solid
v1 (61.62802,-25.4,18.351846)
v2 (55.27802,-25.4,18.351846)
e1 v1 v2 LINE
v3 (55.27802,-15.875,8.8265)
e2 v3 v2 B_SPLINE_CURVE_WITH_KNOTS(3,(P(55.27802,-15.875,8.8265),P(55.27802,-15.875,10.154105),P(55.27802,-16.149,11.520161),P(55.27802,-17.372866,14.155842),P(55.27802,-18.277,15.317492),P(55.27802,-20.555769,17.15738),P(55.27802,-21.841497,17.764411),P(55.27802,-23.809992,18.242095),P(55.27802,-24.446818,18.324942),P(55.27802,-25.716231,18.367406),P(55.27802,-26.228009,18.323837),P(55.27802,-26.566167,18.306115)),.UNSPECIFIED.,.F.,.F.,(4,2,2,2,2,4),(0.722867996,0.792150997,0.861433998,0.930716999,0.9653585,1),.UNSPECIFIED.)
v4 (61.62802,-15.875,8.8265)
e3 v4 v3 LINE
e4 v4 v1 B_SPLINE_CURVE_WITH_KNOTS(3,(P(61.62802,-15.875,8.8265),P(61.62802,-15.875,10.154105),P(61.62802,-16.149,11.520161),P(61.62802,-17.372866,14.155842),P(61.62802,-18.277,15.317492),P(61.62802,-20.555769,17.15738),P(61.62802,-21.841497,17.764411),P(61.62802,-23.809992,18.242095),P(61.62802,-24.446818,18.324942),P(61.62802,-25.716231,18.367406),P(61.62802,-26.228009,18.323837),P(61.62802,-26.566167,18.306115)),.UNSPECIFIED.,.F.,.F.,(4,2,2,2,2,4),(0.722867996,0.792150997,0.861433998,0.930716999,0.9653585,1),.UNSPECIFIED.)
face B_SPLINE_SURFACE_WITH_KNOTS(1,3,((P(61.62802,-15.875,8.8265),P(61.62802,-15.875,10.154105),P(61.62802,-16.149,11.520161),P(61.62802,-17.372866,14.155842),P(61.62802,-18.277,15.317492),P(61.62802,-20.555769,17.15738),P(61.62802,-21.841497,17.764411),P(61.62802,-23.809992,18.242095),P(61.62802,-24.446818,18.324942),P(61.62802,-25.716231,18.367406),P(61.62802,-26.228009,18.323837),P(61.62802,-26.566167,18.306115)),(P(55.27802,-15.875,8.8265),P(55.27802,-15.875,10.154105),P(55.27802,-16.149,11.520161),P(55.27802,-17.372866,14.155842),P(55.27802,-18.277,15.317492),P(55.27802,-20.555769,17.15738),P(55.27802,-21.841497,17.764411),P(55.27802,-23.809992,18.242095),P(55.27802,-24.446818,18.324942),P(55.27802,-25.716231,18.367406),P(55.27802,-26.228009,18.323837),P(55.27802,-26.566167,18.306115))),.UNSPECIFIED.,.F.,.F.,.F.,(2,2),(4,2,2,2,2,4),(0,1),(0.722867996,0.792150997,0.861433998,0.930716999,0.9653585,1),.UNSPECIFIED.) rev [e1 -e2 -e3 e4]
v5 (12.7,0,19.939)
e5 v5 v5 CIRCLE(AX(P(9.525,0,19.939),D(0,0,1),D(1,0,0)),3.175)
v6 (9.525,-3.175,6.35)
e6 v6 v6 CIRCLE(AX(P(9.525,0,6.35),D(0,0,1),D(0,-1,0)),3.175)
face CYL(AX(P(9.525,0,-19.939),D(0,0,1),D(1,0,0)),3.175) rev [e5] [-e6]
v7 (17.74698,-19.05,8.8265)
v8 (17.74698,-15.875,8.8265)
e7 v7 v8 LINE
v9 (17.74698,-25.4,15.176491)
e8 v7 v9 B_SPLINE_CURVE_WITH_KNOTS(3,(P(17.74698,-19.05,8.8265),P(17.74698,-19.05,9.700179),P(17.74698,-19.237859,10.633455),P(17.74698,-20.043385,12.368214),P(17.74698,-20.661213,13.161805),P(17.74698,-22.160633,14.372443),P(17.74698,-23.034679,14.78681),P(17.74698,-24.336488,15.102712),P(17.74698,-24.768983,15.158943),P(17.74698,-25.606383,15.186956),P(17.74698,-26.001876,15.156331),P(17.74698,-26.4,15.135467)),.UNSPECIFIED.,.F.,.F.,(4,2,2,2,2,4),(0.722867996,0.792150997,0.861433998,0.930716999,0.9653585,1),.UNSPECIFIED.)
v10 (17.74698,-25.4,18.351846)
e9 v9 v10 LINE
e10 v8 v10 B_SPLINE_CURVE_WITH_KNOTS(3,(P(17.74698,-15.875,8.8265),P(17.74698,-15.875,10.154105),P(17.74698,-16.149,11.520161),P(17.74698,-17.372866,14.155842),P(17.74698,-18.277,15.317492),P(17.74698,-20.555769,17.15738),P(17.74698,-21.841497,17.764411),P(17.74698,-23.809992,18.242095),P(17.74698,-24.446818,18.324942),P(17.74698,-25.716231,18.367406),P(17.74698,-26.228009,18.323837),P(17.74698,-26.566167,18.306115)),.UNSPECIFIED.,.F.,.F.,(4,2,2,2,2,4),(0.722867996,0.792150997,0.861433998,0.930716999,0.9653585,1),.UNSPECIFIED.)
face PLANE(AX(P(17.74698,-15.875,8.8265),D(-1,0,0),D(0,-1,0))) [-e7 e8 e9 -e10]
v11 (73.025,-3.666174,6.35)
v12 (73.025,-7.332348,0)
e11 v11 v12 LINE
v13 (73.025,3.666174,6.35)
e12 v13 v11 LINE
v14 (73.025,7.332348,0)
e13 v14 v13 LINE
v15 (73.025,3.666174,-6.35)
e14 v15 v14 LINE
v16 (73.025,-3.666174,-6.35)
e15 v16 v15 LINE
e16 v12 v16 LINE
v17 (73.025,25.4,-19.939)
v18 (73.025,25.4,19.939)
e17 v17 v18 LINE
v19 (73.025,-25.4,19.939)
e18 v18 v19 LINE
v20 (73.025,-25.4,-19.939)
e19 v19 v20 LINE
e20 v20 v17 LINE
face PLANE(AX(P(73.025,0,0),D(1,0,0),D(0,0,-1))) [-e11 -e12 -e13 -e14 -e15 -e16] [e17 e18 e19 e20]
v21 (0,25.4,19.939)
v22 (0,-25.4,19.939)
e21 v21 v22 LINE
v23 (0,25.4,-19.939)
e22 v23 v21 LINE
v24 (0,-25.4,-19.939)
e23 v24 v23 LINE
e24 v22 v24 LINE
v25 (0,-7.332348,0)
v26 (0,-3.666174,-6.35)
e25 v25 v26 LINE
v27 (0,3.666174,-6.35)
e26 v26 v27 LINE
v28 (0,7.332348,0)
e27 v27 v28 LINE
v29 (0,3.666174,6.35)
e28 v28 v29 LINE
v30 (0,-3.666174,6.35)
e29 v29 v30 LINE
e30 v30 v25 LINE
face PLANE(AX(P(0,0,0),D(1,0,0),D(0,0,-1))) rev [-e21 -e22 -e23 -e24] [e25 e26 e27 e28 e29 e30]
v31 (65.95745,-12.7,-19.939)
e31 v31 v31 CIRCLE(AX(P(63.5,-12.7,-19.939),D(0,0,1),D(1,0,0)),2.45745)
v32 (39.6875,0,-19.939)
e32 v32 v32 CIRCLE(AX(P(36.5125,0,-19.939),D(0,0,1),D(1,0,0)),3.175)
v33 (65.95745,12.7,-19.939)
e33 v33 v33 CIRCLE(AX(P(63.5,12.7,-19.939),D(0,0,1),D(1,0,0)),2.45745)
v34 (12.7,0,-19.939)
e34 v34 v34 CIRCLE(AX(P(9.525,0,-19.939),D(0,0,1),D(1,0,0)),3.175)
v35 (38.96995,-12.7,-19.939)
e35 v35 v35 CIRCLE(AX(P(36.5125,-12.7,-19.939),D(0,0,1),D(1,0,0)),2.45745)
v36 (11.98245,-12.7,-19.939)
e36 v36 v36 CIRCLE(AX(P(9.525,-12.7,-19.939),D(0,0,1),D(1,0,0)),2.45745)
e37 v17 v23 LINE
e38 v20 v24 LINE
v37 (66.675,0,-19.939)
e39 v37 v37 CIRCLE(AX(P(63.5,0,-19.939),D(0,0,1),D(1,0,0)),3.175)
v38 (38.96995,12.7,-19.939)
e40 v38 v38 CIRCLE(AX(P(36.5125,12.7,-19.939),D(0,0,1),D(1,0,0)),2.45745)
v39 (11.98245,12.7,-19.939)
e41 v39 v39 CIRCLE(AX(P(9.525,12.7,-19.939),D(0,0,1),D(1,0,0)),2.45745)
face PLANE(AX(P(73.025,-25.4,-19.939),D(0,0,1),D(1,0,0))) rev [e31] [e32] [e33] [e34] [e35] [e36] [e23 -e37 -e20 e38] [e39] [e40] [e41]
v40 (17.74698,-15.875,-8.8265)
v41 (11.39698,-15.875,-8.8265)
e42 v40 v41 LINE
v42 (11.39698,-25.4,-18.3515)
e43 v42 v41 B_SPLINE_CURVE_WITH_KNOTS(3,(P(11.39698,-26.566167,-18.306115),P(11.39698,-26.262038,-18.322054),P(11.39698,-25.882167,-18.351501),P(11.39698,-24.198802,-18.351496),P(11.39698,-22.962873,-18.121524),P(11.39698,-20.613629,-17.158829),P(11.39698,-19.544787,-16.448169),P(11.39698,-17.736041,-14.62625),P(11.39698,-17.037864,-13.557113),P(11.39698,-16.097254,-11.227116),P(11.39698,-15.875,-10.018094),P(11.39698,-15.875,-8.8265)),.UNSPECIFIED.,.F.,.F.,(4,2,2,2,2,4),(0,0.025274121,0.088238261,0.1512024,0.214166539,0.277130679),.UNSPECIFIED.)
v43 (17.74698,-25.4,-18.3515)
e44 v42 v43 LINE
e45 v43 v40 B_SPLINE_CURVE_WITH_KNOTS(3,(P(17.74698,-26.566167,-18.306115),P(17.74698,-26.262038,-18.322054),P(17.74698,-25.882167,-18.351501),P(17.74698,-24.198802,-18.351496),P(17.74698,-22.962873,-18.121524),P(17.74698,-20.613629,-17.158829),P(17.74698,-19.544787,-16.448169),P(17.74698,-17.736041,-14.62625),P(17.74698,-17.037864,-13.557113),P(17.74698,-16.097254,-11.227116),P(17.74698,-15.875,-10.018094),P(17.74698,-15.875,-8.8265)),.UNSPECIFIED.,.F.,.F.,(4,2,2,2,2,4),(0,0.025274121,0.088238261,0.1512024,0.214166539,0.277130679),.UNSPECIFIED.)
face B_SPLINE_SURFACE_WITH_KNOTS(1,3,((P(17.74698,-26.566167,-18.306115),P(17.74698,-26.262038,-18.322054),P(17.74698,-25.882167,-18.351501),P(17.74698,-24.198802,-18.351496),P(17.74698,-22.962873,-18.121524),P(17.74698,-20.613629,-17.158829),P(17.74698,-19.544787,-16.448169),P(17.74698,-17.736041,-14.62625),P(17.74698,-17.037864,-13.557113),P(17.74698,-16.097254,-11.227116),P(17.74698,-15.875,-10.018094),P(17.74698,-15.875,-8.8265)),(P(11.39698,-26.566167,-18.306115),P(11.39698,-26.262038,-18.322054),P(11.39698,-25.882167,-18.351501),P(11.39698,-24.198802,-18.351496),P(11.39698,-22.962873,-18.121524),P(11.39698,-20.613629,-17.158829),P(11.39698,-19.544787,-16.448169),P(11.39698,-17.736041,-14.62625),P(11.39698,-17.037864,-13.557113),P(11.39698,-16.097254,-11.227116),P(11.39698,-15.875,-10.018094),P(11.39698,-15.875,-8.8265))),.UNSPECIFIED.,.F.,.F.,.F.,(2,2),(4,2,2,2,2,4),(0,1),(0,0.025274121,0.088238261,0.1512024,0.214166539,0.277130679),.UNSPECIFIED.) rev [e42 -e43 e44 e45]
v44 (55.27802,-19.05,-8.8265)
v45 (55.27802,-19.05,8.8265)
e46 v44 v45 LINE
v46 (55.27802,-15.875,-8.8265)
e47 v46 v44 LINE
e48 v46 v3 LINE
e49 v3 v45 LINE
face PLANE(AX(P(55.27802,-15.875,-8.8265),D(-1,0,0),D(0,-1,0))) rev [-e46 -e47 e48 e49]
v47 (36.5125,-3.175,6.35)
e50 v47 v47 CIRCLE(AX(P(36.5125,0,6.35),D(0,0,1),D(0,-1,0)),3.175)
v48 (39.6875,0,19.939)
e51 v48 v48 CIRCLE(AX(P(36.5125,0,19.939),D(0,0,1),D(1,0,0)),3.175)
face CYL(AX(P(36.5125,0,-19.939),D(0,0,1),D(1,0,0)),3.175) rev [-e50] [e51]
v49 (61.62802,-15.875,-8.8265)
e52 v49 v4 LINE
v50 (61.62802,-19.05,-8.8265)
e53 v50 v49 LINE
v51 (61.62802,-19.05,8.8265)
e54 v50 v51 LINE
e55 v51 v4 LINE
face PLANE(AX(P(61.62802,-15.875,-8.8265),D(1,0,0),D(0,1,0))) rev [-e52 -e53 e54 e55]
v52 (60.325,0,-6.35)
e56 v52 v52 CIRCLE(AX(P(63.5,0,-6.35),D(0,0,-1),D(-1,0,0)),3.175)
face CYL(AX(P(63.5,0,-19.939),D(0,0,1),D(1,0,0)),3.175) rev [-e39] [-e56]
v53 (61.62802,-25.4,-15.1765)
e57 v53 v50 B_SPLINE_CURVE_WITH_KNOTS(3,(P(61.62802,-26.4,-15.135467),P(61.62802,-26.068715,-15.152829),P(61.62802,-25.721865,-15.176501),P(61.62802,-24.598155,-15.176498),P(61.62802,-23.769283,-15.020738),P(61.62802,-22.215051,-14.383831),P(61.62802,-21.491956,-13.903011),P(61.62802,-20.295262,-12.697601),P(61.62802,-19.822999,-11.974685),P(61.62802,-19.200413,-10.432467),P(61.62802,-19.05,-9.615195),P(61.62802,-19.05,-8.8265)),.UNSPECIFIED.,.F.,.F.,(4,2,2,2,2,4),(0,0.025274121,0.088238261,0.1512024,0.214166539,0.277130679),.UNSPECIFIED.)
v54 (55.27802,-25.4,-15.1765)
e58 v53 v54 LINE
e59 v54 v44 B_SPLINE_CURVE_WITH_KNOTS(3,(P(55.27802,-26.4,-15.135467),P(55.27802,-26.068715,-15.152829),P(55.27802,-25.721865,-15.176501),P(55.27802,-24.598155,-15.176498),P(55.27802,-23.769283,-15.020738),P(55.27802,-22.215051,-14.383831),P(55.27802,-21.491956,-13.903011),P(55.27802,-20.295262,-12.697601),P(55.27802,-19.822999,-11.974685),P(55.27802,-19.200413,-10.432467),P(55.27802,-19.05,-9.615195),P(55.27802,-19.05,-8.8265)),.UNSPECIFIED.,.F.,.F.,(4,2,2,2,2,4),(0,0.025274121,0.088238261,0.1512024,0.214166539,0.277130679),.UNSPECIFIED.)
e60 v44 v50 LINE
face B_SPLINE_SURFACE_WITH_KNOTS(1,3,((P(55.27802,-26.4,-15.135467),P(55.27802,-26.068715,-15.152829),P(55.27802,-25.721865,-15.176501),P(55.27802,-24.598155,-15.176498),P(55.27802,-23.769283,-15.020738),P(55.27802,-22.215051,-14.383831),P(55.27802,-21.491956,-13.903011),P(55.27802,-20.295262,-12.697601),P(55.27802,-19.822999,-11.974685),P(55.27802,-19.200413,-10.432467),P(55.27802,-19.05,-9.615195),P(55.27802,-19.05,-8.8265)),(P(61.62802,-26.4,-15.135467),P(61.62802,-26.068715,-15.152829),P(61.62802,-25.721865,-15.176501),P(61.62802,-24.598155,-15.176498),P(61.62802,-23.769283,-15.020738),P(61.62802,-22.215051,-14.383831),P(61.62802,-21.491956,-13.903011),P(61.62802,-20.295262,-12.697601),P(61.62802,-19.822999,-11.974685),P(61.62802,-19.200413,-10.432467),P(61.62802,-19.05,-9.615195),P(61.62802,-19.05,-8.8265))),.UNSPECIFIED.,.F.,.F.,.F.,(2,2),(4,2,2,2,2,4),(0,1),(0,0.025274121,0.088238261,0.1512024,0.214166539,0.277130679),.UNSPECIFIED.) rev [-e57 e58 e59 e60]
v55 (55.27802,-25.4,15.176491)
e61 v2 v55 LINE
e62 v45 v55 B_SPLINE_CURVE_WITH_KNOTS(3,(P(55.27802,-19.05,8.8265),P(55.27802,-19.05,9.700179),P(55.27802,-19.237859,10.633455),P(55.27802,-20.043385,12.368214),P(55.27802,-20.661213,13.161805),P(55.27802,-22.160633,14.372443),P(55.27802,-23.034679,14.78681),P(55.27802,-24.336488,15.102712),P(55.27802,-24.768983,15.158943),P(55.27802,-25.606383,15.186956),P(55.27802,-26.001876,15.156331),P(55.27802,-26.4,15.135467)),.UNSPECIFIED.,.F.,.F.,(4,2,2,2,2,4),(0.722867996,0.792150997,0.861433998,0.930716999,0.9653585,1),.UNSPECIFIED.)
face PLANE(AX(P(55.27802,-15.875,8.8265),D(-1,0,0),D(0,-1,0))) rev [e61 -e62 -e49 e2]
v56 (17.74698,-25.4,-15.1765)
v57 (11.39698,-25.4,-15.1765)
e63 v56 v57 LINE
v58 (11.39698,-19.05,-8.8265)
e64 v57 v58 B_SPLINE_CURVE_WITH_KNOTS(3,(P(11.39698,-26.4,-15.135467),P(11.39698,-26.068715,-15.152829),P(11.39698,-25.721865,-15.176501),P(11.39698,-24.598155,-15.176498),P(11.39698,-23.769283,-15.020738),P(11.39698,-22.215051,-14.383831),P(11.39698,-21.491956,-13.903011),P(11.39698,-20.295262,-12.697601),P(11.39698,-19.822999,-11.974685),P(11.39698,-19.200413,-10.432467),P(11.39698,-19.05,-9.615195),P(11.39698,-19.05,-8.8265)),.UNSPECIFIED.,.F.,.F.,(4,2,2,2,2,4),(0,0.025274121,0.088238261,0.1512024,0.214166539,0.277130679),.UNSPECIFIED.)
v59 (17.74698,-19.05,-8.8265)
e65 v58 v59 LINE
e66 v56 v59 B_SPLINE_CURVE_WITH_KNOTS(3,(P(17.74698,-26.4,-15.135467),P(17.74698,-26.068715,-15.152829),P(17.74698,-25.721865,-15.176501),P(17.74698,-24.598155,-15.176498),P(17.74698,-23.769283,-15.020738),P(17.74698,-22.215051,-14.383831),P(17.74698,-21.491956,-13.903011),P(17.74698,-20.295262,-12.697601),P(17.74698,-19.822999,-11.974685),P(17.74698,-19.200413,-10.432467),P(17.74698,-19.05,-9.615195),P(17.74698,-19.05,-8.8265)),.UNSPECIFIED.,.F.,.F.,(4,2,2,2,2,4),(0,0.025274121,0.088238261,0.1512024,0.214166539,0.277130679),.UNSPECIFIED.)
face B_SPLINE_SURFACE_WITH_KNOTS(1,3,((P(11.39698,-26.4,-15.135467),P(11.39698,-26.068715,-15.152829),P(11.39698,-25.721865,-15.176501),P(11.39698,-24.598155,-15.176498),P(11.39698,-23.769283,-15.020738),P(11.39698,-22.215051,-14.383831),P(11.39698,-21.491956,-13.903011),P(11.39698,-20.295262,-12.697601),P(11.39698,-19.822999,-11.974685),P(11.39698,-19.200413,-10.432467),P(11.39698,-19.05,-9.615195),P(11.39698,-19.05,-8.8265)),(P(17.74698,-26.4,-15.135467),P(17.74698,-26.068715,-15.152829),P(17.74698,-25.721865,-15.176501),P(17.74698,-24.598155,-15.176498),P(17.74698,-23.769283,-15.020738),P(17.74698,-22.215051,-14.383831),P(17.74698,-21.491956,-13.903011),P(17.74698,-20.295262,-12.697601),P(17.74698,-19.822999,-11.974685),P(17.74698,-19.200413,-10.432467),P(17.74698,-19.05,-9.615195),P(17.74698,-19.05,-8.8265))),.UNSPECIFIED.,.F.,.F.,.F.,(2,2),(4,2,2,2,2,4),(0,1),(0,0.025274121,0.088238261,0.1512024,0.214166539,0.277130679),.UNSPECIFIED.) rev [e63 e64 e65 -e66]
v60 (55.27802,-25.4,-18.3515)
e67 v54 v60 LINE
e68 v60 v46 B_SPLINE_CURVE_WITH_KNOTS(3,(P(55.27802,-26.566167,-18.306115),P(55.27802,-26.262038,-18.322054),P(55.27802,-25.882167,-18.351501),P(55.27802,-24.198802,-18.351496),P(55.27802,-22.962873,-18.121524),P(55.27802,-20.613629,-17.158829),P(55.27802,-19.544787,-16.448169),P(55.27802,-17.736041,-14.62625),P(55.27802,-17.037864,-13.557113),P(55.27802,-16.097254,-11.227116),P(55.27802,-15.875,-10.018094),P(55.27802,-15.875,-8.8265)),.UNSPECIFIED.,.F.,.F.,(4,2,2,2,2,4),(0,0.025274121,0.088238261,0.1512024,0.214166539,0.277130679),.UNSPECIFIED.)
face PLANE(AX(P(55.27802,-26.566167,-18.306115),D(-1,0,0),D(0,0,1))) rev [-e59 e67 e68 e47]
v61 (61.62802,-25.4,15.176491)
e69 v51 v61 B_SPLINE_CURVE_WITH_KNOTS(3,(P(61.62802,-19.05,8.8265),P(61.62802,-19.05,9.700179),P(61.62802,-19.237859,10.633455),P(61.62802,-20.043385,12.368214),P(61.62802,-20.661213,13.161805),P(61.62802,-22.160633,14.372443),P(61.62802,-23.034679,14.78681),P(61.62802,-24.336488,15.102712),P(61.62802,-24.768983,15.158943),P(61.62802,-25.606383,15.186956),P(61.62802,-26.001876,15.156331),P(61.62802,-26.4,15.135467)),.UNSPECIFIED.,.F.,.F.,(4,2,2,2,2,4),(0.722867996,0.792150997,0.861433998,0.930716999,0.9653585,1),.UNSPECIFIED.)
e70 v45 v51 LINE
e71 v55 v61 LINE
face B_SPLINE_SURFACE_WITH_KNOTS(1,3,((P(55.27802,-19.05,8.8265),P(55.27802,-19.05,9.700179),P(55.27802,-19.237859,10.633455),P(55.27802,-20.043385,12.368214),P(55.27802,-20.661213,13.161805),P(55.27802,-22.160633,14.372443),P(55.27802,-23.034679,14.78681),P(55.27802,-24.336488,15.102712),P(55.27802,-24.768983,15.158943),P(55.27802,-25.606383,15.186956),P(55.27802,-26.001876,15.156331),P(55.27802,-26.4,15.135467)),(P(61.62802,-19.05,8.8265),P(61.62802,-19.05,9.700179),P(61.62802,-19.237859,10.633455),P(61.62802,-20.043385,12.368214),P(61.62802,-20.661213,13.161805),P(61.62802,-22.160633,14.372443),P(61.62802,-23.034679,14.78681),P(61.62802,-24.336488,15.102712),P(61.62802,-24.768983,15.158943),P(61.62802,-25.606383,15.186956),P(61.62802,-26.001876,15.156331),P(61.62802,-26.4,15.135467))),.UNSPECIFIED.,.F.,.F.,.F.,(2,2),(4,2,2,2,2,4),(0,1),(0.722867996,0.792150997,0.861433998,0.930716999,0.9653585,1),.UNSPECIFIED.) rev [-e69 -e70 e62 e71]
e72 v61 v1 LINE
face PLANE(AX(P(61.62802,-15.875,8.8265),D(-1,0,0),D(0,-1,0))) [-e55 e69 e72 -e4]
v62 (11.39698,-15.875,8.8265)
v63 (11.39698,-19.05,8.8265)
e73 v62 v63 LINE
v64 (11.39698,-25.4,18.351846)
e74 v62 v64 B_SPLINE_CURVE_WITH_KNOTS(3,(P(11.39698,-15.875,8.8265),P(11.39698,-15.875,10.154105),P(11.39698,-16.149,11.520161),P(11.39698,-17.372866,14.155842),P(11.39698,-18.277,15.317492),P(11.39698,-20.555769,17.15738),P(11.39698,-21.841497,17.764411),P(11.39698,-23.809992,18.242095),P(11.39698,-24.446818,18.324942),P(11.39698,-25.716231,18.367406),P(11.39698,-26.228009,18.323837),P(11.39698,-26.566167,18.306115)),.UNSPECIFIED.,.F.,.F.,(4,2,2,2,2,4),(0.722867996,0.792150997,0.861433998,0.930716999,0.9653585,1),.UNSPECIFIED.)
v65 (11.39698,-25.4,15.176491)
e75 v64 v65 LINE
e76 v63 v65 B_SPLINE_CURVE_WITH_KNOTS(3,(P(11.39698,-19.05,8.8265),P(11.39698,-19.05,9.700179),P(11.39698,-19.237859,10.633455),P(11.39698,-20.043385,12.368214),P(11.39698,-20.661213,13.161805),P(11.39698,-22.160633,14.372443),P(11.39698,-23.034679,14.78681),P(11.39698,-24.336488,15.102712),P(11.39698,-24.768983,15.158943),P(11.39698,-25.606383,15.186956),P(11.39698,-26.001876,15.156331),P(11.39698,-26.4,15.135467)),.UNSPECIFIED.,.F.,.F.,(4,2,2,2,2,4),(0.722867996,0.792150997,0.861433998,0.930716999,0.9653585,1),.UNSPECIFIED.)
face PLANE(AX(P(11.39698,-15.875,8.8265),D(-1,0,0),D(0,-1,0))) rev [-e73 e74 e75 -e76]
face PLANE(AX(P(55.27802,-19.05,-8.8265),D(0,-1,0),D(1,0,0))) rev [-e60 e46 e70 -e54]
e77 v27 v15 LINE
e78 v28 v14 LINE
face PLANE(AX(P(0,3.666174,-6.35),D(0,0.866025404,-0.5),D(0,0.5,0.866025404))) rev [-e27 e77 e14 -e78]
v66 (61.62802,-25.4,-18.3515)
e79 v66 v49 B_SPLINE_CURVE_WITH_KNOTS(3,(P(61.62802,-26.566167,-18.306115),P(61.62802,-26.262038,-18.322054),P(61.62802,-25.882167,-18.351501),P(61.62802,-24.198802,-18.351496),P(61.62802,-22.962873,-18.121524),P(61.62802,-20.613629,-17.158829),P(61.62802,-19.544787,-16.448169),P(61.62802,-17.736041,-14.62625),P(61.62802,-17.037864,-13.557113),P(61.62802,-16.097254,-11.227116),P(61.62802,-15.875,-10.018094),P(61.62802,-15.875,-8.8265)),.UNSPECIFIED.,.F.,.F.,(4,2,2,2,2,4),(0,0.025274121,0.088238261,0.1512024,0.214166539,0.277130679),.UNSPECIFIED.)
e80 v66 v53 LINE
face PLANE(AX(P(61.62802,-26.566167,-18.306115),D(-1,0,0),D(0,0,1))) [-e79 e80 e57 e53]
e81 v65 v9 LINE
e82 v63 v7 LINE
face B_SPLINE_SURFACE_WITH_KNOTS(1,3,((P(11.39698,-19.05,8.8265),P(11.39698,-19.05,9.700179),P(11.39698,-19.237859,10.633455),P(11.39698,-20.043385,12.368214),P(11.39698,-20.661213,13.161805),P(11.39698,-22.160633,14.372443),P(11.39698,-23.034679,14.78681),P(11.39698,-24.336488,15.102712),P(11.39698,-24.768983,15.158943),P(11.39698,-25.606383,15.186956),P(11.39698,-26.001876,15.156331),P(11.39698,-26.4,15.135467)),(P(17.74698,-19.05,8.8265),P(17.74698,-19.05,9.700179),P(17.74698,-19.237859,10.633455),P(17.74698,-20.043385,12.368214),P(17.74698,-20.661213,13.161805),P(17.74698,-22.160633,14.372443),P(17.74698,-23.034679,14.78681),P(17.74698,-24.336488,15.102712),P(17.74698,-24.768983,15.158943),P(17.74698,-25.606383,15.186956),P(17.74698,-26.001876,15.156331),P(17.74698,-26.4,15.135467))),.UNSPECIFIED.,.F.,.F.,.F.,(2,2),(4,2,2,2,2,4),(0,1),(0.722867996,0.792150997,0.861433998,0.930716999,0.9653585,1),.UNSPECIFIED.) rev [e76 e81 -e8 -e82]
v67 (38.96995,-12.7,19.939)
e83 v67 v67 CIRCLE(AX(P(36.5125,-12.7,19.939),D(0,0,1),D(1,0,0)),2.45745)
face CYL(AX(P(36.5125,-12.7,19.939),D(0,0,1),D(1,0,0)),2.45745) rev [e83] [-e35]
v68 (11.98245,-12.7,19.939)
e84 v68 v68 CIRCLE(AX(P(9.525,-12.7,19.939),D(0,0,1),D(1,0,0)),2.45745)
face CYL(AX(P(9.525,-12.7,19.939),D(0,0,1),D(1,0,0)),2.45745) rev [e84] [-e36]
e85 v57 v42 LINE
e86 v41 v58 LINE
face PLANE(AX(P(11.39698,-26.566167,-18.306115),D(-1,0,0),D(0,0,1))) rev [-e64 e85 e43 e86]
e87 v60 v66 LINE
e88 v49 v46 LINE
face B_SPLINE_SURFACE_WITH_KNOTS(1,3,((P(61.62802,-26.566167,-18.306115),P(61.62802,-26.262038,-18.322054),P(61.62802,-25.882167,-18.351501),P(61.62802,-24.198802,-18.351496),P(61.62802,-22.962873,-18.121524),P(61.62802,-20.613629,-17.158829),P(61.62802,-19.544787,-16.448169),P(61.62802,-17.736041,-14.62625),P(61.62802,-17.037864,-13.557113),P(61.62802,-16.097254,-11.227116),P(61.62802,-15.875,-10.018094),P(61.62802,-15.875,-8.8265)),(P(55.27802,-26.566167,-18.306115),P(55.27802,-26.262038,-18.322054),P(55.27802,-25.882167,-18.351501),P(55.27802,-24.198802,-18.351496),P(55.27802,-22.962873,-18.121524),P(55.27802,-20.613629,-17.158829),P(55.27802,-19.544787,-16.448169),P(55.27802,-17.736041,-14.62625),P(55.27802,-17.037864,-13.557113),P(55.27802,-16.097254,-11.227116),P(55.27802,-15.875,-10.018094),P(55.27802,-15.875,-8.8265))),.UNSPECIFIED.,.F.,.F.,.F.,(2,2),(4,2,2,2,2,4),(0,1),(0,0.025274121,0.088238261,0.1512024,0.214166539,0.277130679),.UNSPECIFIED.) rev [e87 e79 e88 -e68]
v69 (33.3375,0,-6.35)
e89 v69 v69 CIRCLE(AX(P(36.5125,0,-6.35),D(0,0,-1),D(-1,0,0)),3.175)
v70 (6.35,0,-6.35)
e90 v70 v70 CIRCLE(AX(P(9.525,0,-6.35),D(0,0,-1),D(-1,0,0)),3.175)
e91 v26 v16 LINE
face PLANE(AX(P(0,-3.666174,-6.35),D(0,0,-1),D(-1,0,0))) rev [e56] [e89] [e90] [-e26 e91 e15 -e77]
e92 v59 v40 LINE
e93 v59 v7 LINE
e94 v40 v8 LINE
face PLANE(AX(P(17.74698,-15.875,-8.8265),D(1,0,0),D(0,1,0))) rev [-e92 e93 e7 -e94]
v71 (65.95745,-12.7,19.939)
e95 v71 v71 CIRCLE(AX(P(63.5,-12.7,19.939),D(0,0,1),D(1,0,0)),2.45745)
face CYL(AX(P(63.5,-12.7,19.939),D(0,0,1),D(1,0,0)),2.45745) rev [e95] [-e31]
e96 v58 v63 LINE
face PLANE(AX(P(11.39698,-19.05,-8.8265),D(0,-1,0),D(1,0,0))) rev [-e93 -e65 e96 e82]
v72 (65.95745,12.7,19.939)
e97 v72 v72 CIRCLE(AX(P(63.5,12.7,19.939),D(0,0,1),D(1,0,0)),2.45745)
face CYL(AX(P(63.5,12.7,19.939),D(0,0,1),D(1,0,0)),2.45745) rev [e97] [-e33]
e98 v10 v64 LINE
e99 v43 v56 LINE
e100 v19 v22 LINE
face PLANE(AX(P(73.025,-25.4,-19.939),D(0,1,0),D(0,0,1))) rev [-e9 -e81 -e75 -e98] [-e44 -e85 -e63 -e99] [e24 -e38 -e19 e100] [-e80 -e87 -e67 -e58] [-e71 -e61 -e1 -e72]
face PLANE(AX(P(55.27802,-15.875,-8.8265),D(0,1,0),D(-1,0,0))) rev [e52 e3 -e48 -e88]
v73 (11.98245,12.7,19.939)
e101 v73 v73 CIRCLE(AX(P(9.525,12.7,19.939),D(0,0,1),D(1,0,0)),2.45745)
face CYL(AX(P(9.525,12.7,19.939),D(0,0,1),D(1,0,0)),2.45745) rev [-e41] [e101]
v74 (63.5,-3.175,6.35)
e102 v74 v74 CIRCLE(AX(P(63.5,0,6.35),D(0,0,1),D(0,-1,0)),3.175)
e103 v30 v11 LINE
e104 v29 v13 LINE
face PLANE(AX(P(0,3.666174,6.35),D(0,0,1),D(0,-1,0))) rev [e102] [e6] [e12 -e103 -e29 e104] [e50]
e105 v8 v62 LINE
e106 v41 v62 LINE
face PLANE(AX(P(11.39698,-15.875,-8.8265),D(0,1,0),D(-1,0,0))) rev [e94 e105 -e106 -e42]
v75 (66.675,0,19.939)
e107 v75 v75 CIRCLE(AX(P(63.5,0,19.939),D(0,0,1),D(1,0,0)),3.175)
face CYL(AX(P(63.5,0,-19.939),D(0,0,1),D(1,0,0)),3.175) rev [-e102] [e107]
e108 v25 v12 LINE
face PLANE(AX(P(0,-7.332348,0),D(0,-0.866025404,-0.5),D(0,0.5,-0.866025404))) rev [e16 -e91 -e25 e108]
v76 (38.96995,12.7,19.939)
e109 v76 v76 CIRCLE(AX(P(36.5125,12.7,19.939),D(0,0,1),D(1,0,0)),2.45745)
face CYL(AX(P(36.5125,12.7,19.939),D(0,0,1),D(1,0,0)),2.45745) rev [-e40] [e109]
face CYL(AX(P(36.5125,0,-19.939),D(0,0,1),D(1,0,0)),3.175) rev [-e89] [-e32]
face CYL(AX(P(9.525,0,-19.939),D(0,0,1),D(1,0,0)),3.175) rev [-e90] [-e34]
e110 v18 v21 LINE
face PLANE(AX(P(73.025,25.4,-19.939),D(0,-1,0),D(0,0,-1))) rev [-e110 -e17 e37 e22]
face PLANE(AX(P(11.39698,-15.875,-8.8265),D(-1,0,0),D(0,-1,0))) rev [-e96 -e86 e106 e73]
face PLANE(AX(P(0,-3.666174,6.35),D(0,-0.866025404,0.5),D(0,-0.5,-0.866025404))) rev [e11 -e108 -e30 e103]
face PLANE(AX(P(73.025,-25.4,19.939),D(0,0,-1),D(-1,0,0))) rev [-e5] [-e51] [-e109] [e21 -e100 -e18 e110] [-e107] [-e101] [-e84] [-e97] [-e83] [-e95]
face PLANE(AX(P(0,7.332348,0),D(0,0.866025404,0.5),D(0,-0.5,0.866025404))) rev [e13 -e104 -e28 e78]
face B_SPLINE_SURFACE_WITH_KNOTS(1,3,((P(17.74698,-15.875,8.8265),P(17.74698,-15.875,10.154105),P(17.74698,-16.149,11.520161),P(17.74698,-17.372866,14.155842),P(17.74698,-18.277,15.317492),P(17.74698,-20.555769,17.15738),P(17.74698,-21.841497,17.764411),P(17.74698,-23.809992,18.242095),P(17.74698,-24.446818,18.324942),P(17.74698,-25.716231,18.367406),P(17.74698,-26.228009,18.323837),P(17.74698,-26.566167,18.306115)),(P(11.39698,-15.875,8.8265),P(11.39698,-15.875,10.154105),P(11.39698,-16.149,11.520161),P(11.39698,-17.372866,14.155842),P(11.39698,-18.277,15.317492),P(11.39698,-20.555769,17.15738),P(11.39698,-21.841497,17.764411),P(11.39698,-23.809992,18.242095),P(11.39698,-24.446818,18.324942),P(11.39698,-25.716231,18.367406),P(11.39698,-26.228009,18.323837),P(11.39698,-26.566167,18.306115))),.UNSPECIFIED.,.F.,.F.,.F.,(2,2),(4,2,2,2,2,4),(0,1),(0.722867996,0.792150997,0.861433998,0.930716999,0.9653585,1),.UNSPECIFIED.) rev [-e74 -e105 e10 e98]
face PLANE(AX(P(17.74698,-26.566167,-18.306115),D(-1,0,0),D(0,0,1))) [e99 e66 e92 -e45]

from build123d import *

# Parameters (mm, degrees)
SKETCH1_W                    = 39.878
SKETCH1_H                    = 50.8
BOSS_EXTRUDE1_DEPTH          = 73.025
CUT_EXTRUDE2_DEPTH           = 80.845941325
SKETCH9_R                    = 3.175
CUT_EXTRUDE4_DEPTH           = 87.994629196
CUT_SWEEP1_START             = 11.39698
CUT_SWEEP1_DEPTH             = 6.35
CUT_SWEEP1_START_2           = 55.27802
CUT_SWEEP1_2_DEPTH           = 6.35
F_10_0_1935_DIAMETER_HOLE1_D = 4.9149


# Read off the part's stored shape, not the designer's step: Cut-Sweep1
with BuildPart() as part:
    # Sketch1 → Boss-Extrude1 (new body)
    with BuildSketch(Plane(origin=(0, 0, 0), x_dir=(0, 0, -1), z_dir=(1, 0, 0))):
        Rectangle(SKETCH1_W, SKETCH1_H)
    extrude(amount=BOSS_EXTRUDE1_DEPTH)

    # Sketch3 → Cut-Extrude2 (cut, through all)
    with BuildSketch(Plane(origin=(73.025, 0, 0), x_dir=(0, 0, -1), z_dir=(1, 0, 0))):
        Polygon((6.35, 3.666174209), (0, 7.332348419), (-6.35, 3.666174209), (-6.35, -3.666174209), (0, -7.332348419), (6.35, -3.666174209), align=None)
    extrude(amount=-CUT_EXTRUDE2_DEPTH, mode=Mode.SUBTRACT)

    # Sketch9 → Cut-Extrude4 (cut, through all)
    with BuildSketch(Plane.XY.offset(19.939)):
        with Locations((9.525, 0)):
            Circle(SKETCH9_R)
        with Locations((36.5125, 0)):
            Circle(SKETCH9_R)
        with Locations((63.5, 0)):
            Circle(SKETCH9_R)
    extrude(amount=-CUT_EXTRUDE4_DEPTH, mode=Mode.SUBTRACT)

    # Cut-Sweep1 outline → Cut-Sweep1 (cut)
    with BuildSketch(Plane.YZ.offset(CUT_SWEEP1_START)):
        with BuildLine():
            add(Edge.make_bspline(
                [(-25.4, -15.1765), (-24.598155248, -15.176498148), (-23.769283214, -15.020738143), (-22.215051315, -14.383830521), (-21.491956074, -13.903011028), (-20.295262296, -12.697601351), (-19.822999045, -11.974685313), (-19.200412611, -10.432467289), (-19.050000001, -9.615195458), (-19.050000001, -8.8265)],
                knots=[0.025274121, 0.025274121, 0.025274121, 0.025274121, 0.088238261, 0.088238261, 0.1512024, 0.1512024, 0.214166539, 0.214166539, 0.277130679, 0.277130679, 0.277130679, 0.277130679], degree=3))
            Line((-25.4, -15.1765), (-25.4, -18.3515))
            add(Edge.make_bspline(
                [(-25.4, -18.3515), (-24.198801546, -18.351496292), (-22.962872636, -18.121523992), (-20.613629157, -17.158829003), (-19.544786623, -16.448168929), (-17.736040932, -14.626249639), (-17.037863537, -13.557113154), (-16.097253947, -11.227115749), (-15.875000001, -10.018094012), (-15.875000001, -8.8265)],
                knots=[0.025274121, 0.025274121, 0.025274121, 0.025274121, 0.088238261, 0.088238261, 0.1512024, 0.1512024, 0.214166539, 0.214166539, 0.277130679, 0.277130679, 0.277130679, 0.277130679], degree=3))
            Line((-15.875000001, -8.8265), (-15.875000001, 8.8265))
            add(Edge.make_bspline(
                [(-15.875000001, 8.8265), (-15.875000001, 10.154104999), (-16.148999917, 11.520161211), (-17.372865777, 14.155841649), (-18.276999964, 15.317491554), (-20.555768544, 17.157379798), (-21.841496853, 17.764411009), (-23.809992027, 18.242095131), (-24.446817823, 18.324942193), (-25.191458658, 18.349851774), (-25.29770495, 18.351585251), (-25.4, 18.351845725)],
                knots=[0.722867996, 0.722867996, 0.722867996, 0.722867996, 0.792150997, 0.792150997, 0.861433998, 0.861433998, 0.930716999, 0.930716999, 0.9653585, 0.9653585, 0.971358568, 0.971358568, 0.971358568, 0.971358568], degree=3))
            Line((-25.4, 18.351845725), (-25.4, 15.17649118))
            add(Edge.make_bspline(
                [(-19.050000001, 8.8265), (-19.050000001, 9.700178846), (-19.23785851, 10.633454764), (-20.043385287, 12.368213809), (-20.66121287, 13.161804707), (-22.160632803, 14.372442861), (-23.034678664, 14.786809878), (-24.336487637, 15.102712151), (-24.768983217, 15.158942974), (-25.259087559, 15.175338178), (-25.32981717, 15.176428808), (-25.4, 15.17649118)],
                knots=[0.722867996, 0.722867996, 0.722867996, 0.722867996, 0.792150997, 0.792150997, 0.861433998, 0.861433998, 0.930716999, 0.930716999, 0.9653585, 0.9653585, 0.971266218, 0.971266218, 0.971266218, 0.971266218], degree=3))
            Line((-19.050000001, 8.8265), (-19.050000001, -8.8265))
        make_face()
    extrude(amount=CUT_SWEEP1_DEPTH, mode=Mode.SUBTRACT)

    # Cut-Sweep1 2 outline → Cut-Sweep1 2 (cut)
    with BuildSketch(Plane.YZ.offset(CUT_SWEEP1_START_2)):
        with BuildLine():
            add(Edge.make_bspline(
                [(-25.4, -15.1765), (-24.598155248, -15.176498148), (-23.769283214, -15.020738143), (-22.215051315, -14.383830521), (-21.491956074, -13.903011028), (-20.295262296, -12.697601351), (-19.822999045, -11.974685313), (-19.200412611, -10.432467289), (-19.050000001, -9.615195458), (-19.050000001, -8.8265)],
                knots=[0.025274121, 0.025274121, 0.025274121, 0.025274121, 0.088238261, 0.088238261, 0.1512024, 0.1512024, 0.214166539, 0.214166539, 0.277130679, 0.277130679, 0.277130679, 0.277130679], degree=3))
            Line((-25.4, -15.1765), (-25.4, -18.3515))
            add(Edge.make_bspline(
                [(-25.4, -18.3515), (-24.198801546, -18.351496292), (-22.962872636, -18.121523992), (-20.613629157, -17.158829003), (-19.544786623, -16.448168929), (-17.736040932, -14.626249639), (-17.037863537, -13.557113154), (-16.097253947, -11.227115749), (-15.875000001, -10.018094012), (-15.875000001, -8.8265)],
                knots=[0.025274121, 0.025274121, 0.025274121, 0.025274121, 0.088238261, 0.088238261, 0.1512024, 0.1512024, 0.214166539, 0.214166539, 0.277130679, 0.277130679, 0.277130679, 0.277130679], degree=3))
            Line((-15.875000001, -8.8265), (-15.875000001, 8.8265))
            add(Edge.make_bspline(
                [(-15.875000001, 8.8265), (-15.875000001, 10.154104999), (-16.148999917, 11.520161211), (-17.372865777, 14.155841649), (-18.276999964, 15.317491554), (-20.555768544, 17.157379798), (-21.841496853, 17.764411009), (-23.809992027, 18.242095131), (-24.446817823, 18.324942193), (-25.191458658, 18.349851774), (-25.29770495, 18.351585251), (-25.4, 18.351845725)],
                knots=[0.722867996, 0.722867996, 0.722867996, 0.722867996, 0.792150997, 0.792150997, 0.861433998, 0.861433998, 0.930716999, 0.930716999, 0.9653585, 0.9653585, 0.971358568, 0.971358568, 0.971358568, 0.971358568], degree=3))
            Line((-25.4, 18.351845725), (-25.4, 15.17649118))
            add(Edge.make_bspline(
                [(-19.050000001, 8.8265), (-19.050000001, 9.700178846), (-19.23785851, 10.633454764), (-20.043385287, 12.368213809), (-20.66121287, 13.161804707), (-22.160632803, 14.372442861), (-23.034678664, 14.786809878), (-24.336487637, 15.102712151), (-24.768983217, 15.158942974), (-25.259087559, 15.175338178), (-25.32981717, 15.176428808), (-25.4, 15.17649118)],
                knots=[0.722867996, 0.722867996, 0.722867996, 0.722867996, 0.792150997, 0.792150997, 0.861433998, 0.861433998, 0.930716999, 0.930716999, 0.9653585, 0.9653585, 0.971266218, 0.971266218, 0.971266218, 0.971266218], degree=3))
            Line((-19.050000001, 8.8265), (-19.050000001, -8.8265))
        make_face()
    extrude(amount=CUT_SWEEP1_2_DEPTH, mode=Mode.SUBTRACT)

    # #10 (0.1935) Diameter Hole1 (through all)
    with Locations(Plane.XY.offset(19.939)):
        with Locations((9.525, 12.7), (36.5125, 12.7), (63.5, 12.7), (63.5, -12.7), (36.5125, -12.7), (9.525, -12.7)):
            Hole(F_10_0_1935_DIAMETER_HOLE1_D / 2)


solid = part.part
